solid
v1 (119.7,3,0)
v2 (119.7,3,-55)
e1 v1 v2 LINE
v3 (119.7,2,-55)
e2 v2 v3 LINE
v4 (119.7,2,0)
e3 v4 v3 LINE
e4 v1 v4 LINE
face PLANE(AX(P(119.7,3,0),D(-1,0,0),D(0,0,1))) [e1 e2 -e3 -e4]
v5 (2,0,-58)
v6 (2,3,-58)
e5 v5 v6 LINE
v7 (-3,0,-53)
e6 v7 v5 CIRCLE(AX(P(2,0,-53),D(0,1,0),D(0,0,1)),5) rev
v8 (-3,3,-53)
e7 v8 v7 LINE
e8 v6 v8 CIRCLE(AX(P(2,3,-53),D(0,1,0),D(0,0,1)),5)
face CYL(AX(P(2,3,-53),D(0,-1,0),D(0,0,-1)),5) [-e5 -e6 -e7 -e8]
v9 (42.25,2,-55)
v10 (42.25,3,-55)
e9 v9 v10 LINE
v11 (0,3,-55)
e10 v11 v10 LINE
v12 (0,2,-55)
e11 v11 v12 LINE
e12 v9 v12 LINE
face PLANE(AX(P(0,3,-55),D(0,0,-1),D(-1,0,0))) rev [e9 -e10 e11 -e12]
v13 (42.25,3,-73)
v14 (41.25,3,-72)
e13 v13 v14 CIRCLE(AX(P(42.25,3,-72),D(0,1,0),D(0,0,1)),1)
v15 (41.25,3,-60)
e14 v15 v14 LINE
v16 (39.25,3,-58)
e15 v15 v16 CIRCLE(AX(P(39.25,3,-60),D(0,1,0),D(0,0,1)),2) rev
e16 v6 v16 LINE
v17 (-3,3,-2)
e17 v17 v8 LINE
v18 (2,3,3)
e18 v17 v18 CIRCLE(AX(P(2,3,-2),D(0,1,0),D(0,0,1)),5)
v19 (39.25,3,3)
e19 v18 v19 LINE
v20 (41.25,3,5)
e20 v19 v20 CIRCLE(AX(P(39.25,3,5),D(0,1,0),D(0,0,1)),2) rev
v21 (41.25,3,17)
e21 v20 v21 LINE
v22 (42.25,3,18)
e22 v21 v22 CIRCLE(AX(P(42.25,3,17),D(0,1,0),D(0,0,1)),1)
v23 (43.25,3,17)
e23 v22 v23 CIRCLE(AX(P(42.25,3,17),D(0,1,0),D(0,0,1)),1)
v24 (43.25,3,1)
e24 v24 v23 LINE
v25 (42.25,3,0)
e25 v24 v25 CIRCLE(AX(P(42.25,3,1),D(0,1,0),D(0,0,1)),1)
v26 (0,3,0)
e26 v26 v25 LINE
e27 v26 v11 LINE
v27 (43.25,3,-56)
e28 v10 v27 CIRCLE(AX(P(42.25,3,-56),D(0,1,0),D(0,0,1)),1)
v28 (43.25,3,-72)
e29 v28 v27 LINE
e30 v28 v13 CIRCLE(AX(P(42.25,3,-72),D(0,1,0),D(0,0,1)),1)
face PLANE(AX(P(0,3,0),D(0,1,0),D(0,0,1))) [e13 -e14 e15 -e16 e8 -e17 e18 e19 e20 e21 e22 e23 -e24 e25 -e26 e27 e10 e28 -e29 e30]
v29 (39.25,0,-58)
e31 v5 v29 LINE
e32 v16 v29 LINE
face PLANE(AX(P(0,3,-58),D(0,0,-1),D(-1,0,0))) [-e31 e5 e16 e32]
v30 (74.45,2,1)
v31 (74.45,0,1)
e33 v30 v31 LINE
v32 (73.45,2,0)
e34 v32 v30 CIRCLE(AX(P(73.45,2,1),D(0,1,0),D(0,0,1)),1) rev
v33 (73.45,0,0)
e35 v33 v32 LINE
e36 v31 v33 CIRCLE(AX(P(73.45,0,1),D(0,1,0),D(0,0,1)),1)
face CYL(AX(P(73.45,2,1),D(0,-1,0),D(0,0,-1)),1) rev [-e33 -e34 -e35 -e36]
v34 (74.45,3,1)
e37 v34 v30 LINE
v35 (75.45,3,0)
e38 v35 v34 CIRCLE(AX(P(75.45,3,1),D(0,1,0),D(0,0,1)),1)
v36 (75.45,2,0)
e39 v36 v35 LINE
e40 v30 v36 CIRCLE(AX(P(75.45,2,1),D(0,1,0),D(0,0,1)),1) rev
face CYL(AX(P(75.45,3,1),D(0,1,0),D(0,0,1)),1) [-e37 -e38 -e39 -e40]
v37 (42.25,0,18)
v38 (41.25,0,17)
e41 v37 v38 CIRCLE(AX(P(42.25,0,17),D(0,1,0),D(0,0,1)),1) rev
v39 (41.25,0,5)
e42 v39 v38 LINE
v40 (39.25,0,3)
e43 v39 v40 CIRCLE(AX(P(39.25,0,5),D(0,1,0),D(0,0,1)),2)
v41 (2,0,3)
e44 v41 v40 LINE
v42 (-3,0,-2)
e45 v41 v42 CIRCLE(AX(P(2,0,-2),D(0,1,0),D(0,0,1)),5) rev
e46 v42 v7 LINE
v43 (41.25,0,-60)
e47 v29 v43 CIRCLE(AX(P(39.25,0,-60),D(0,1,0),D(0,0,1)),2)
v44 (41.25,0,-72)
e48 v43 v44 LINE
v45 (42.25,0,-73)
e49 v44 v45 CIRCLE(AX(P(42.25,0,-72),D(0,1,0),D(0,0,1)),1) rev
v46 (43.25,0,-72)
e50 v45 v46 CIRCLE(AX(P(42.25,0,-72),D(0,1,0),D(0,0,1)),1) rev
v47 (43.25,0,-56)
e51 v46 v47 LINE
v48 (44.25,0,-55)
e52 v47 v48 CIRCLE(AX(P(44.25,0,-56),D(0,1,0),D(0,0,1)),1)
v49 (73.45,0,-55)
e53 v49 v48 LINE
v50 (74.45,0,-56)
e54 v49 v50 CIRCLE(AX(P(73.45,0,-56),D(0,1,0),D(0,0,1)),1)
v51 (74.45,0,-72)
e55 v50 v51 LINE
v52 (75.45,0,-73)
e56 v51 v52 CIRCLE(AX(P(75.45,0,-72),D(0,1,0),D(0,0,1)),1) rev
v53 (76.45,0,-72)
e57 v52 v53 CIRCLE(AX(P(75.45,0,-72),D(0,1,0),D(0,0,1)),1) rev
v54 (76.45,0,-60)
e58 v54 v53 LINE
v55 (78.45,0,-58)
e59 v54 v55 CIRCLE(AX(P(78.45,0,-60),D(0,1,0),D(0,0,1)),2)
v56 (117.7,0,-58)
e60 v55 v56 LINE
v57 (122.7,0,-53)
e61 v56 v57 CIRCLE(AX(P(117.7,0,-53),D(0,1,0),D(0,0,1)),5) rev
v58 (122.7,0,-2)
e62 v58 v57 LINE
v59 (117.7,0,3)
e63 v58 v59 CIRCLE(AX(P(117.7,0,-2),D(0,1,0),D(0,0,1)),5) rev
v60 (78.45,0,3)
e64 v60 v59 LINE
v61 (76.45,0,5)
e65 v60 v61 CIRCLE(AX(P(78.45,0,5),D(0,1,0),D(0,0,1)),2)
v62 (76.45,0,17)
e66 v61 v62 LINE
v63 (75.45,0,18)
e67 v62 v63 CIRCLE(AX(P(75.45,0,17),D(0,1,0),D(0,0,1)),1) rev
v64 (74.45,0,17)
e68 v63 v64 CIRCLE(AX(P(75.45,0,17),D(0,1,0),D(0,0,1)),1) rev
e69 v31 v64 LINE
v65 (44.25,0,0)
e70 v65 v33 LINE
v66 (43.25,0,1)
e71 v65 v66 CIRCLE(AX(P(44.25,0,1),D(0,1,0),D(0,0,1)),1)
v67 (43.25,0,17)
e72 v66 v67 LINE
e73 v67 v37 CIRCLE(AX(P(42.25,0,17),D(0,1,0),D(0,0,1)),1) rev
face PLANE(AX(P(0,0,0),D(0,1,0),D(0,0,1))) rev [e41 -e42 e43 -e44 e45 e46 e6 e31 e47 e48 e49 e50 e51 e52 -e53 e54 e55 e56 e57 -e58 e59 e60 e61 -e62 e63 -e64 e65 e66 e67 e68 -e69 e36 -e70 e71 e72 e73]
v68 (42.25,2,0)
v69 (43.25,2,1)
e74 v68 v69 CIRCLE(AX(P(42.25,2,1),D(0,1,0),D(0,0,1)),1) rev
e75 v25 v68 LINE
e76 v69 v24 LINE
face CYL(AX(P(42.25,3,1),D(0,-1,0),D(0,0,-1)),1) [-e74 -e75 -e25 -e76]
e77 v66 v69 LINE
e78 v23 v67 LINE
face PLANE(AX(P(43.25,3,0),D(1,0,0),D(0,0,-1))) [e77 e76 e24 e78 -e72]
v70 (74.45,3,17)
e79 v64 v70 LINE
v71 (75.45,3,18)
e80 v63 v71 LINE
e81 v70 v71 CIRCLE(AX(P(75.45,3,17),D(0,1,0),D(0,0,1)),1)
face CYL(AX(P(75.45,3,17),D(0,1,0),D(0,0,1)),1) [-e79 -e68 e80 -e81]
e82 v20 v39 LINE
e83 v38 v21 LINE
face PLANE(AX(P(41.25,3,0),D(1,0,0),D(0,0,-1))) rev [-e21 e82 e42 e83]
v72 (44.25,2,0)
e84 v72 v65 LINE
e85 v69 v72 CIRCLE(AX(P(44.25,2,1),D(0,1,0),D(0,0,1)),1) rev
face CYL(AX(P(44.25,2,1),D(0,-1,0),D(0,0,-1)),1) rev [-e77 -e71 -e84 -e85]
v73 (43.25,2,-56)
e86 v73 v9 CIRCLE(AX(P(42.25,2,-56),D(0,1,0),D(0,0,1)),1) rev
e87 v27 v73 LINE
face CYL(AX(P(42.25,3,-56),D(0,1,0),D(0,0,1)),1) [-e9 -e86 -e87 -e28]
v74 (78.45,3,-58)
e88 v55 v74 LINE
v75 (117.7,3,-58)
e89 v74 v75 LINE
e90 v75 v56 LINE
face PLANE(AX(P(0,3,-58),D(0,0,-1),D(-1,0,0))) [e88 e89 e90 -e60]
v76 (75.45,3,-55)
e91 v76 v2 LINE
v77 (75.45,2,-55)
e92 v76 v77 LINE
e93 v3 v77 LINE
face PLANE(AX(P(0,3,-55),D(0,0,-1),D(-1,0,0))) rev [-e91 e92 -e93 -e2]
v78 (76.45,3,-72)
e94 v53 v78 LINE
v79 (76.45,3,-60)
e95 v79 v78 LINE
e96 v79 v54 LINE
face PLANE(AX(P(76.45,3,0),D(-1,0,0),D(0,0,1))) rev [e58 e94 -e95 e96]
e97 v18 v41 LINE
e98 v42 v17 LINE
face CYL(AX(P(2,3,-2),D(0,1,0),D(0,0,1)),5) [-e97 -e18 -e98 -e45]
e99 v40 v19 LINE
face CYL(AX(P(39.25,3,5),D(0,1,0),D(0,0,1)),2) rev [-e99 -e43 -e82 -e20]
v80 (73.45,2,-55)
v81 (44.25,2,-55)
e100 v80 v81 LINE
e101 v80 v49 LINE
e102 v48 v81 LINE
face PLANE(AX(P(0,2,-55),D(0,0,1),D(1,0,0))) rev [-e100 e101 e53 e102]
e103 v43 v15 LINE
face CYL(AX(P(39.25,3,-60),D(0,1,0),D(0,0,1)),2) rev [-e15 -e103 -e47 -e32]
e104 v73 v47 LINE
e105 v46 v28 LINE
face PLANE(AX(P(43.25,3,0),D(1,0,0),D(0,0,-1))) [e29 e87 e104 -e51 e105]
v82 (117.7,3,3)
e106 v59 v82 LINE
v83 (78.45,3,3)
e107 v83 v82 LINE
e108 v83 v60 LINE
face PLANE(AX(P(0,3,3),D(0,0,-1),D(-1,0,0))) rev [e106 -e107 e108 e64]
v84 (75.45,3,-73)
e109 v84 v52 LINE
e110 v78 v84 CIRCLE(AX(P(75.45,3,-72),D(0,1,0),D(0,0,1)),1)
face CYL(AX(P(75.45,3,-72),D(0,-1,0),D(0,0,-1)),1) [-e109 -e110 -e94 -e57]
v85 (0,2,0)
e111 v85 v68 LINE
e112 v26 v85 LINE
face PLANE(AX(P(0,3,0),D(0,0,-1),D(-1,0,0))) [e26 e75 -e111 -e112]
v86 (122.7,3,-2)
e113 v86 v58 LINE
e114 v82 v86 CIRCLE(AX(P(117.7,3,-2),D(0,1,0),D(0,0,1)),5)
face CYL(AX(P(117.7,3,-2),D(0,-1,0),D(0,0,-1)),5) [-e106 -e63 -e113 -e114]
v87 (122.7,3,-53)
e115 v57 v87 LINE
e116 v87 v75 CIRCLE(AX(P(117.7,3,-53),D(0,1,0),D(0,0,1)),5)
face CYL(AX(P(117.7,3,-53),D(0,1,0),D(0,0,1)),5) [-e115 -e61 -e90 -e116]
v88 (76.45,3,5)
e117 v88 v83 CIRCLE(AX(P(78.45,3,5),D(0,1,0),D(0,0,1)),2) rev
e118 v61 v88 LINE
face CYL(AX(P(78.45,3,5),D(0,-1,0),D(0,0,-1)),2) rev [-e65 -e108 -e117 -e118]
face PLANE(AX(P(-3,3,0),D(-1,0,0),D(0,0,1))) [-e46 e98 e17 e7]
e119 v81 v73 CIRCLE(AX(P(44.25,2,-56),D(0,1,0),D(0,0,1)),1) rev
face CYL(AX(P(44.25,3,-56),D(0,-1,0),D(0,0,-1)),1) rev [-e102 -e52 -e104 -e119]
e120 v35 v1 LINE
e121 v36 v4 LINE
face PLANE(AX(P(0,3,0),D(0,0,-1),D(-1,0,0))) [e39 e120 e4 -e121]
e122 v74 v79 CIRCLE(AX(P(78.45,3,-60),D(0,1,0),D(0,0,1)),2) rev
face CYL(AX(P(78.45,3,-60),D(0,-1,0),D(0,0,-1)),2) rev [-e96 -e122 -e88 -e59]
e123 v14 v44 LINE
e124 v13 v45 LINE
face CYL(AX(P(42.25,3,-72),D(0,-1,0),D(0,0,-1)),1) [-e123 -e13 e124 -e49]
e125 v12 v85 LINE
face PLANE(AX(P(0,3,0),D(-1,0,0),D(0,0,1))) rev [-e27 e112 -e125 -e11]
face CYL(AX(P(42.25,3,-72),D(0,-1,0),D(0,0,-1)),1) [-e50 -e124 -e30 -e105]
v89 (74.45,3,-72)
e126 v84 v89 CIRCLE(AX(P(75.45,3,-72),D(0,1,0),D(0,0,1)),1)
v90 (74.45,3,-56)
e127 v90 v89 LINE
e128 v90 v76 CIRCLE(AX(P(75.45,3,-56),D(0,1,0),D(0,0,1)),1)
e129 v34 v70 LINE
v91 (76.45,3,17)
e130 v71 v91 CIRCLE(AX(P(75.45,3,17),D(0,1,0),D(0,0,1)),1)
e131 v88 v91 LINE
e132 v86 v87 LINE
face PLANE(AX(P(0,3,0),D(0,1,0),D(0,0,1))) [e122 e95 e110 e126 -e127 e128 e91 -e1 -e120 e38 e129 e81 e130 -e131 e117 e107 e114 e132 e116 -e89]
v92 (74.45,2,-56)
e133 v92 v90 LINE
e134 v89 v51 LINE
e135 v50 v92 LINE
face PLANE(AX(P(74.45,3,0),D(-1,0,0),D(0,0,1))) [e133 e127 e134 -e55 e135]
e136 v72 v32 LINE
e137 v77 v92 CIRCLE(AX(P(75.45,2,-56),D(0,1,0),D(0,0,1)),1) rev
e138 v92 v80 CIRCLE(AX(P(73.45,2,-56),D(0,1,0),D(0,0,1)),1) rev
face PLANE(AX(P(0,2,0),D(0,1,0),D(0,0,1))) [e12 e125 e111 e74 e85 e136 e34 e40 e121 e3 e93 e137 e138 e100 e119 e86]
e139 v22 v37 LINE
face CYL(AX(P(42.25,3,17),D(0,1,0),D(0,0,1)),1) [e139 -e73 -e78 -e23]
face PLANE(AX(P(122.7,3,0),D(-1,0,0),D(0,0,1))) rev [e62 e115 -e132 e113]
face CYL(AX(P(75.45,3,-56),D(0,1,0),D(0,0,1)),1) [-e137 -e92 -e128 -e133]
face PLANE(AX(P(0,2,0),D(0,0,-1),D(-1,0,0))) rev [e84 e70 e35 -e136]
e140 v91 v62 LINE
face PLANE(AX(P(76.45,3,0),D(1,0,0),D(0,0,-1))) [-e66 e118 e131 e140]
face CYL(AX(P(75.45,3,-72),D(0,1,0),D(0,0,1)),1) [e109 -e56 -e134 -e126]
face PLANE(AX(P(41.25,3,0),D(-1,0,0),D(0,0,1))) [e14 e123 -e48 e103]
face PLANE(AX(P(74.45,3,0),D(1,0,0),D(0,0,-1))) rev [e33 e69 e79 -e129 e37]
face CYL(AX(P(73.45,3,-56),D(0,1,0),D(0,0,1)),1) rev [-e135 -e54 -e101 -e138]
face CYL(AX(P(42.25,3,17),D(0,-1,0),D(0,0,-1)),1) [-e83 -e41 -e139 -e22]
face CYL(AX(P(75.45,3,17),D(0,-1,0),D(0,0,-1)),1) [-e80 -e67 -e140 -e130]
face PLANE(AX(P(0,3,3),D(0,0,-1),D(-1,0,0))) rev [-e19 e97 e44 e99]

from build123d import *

# Parameters (mm, degrees)
BOSS_EXTRUDE3_DEPTH   = 3
BOSS_EXTRUDE3_2_DEPTH = 3
SKETCH2_W             = 119.7
SKETCH2_H             = 55
BOSS_EXTRUDE4_DEPTH   = 2
FILLET5_R             = 2
FILLET6_R             = 5
FILLET7_R             = 1
FILLET8_R             = 1
FILLET9_R             = 1


with BuildPart() as part:
    # Sketch1 → Boss-Extrude3 (new body)
    with BuildSketch(Plane(origin=(0, 0, 0), x_dir=(1, 0, 0), z_dir=(0, 1, 0))):
        Polygon((119.7, 0), (74.45, 0), (74.45, -3), (74.45, -18), (76.45, -18), (76.45, -3), (122.7, -3), (122.7, 58), (76.45, 58), (76.45, 73), (74.45, 73), (74.45, 58), (74.45, 55), (119.7, 55), align=None)
    extrude(amount=BOSS_EXTRUDE3_DEPTH)



with BuildPart() as body_2:
    # Sketch1 → Boss-Extrude3 2 (new body)
    with BuildSketch(Plane(origin=(0, 0, 0), x_dir=(1, 0, 0), z_dir=(0, 1, 0))):
        Polygon((-3, 58), (-3, -3), (41.25, -3), (41.25, -18), (43.25, -18), (43.25, -3), (43.25, 0), (0, 0), (0, 55), (43.25, 55), (43.25, 58), (43.25, 73), (41.25, 73), (41.25, 58), align=None)
    extrude(amount=BOSS_EXTRUDE3_2_DEPTH)


with BuildPart() as part_1:
    add(part.part)

    add(body_2.part)  # Boss-Extrude4 merges body 2
    # Sketch2 → Boss-Extrude4 (add)
    with BuildSketch(Plane(origin=(0, 0, 0), x_dir=(1, 0, 0), z_dir=(0, 1, 0))):
        with Locations((59.85, 27.5)):
            Rectangle(SKETCH2_W, SKETCH2_H)
    extrude(amount=BOSS_EXTRUDE4_DEPTH)

    # Fillet5
    fillet5_edges = [part_1.edges().sort_by_distance(p)[0] for p in [
        (76.45, 1.5, -58),
        (76.45, 1.5, 3),
        (41.25, 1.5, -58),
        (41.25, 1.5, 3),
    ]]
    fillet(fillet5_edges, radius=FILLET5_R)

    # Fillet6
    fillet6_edges = [part_1.edges().sort_by_distance(p)[0] for p in [
        (122.7, 1.5, -58),
        (122.7, 1.5, 3),
        (-3, 1.5, -58),
        (-3, 1.5, 3),
    ]]
    fillet(fillet6_edges, radius=FILLET6_R)

    # Fillet7
    fillet7_edges = [part_1.edges().sort_by_distance(p)[0] for p in [
        (74.45, 1.5, 18),
        (76.45, 1.5, 18),
        (43.25, 1.5, 18),
        (41.25, 1.5, 18),
        (41.25, 1.5, -73),
        (43.25, 1.5, -73),
        (74.45, 1.5, -73),
        (76.45, 1.5, -73),
    ]]
    fillet(fillet7_edges, radius=FILLET7_R - 0.0001)  # a hair under: the kernel refuses the full size

    # Fillet8
    fillet8_edges = [part_1.edges().sort_by_distance(p)[0] for p in [
        (74.45, 2.5, -55),
        (74.45, 2.5, 0),
        (43.25, 2.5, 0),
        (43.25, 2.5, -55),
    ]]
    fillet(fillet8_edges, radius=FILLET8_R)

    # Fillet9
    fillet9_edges = [part_1.edges().sort_by_distance(p)[0] for p in [
        (43.25, 1, -55),
        (74.45, 1, -55),
        (74.45, 1, 0),
        (43.25, 1, 0),
    ]]
    fillet(fillet9_edges, radius=FILLET9_R)


solid = part_1.part
